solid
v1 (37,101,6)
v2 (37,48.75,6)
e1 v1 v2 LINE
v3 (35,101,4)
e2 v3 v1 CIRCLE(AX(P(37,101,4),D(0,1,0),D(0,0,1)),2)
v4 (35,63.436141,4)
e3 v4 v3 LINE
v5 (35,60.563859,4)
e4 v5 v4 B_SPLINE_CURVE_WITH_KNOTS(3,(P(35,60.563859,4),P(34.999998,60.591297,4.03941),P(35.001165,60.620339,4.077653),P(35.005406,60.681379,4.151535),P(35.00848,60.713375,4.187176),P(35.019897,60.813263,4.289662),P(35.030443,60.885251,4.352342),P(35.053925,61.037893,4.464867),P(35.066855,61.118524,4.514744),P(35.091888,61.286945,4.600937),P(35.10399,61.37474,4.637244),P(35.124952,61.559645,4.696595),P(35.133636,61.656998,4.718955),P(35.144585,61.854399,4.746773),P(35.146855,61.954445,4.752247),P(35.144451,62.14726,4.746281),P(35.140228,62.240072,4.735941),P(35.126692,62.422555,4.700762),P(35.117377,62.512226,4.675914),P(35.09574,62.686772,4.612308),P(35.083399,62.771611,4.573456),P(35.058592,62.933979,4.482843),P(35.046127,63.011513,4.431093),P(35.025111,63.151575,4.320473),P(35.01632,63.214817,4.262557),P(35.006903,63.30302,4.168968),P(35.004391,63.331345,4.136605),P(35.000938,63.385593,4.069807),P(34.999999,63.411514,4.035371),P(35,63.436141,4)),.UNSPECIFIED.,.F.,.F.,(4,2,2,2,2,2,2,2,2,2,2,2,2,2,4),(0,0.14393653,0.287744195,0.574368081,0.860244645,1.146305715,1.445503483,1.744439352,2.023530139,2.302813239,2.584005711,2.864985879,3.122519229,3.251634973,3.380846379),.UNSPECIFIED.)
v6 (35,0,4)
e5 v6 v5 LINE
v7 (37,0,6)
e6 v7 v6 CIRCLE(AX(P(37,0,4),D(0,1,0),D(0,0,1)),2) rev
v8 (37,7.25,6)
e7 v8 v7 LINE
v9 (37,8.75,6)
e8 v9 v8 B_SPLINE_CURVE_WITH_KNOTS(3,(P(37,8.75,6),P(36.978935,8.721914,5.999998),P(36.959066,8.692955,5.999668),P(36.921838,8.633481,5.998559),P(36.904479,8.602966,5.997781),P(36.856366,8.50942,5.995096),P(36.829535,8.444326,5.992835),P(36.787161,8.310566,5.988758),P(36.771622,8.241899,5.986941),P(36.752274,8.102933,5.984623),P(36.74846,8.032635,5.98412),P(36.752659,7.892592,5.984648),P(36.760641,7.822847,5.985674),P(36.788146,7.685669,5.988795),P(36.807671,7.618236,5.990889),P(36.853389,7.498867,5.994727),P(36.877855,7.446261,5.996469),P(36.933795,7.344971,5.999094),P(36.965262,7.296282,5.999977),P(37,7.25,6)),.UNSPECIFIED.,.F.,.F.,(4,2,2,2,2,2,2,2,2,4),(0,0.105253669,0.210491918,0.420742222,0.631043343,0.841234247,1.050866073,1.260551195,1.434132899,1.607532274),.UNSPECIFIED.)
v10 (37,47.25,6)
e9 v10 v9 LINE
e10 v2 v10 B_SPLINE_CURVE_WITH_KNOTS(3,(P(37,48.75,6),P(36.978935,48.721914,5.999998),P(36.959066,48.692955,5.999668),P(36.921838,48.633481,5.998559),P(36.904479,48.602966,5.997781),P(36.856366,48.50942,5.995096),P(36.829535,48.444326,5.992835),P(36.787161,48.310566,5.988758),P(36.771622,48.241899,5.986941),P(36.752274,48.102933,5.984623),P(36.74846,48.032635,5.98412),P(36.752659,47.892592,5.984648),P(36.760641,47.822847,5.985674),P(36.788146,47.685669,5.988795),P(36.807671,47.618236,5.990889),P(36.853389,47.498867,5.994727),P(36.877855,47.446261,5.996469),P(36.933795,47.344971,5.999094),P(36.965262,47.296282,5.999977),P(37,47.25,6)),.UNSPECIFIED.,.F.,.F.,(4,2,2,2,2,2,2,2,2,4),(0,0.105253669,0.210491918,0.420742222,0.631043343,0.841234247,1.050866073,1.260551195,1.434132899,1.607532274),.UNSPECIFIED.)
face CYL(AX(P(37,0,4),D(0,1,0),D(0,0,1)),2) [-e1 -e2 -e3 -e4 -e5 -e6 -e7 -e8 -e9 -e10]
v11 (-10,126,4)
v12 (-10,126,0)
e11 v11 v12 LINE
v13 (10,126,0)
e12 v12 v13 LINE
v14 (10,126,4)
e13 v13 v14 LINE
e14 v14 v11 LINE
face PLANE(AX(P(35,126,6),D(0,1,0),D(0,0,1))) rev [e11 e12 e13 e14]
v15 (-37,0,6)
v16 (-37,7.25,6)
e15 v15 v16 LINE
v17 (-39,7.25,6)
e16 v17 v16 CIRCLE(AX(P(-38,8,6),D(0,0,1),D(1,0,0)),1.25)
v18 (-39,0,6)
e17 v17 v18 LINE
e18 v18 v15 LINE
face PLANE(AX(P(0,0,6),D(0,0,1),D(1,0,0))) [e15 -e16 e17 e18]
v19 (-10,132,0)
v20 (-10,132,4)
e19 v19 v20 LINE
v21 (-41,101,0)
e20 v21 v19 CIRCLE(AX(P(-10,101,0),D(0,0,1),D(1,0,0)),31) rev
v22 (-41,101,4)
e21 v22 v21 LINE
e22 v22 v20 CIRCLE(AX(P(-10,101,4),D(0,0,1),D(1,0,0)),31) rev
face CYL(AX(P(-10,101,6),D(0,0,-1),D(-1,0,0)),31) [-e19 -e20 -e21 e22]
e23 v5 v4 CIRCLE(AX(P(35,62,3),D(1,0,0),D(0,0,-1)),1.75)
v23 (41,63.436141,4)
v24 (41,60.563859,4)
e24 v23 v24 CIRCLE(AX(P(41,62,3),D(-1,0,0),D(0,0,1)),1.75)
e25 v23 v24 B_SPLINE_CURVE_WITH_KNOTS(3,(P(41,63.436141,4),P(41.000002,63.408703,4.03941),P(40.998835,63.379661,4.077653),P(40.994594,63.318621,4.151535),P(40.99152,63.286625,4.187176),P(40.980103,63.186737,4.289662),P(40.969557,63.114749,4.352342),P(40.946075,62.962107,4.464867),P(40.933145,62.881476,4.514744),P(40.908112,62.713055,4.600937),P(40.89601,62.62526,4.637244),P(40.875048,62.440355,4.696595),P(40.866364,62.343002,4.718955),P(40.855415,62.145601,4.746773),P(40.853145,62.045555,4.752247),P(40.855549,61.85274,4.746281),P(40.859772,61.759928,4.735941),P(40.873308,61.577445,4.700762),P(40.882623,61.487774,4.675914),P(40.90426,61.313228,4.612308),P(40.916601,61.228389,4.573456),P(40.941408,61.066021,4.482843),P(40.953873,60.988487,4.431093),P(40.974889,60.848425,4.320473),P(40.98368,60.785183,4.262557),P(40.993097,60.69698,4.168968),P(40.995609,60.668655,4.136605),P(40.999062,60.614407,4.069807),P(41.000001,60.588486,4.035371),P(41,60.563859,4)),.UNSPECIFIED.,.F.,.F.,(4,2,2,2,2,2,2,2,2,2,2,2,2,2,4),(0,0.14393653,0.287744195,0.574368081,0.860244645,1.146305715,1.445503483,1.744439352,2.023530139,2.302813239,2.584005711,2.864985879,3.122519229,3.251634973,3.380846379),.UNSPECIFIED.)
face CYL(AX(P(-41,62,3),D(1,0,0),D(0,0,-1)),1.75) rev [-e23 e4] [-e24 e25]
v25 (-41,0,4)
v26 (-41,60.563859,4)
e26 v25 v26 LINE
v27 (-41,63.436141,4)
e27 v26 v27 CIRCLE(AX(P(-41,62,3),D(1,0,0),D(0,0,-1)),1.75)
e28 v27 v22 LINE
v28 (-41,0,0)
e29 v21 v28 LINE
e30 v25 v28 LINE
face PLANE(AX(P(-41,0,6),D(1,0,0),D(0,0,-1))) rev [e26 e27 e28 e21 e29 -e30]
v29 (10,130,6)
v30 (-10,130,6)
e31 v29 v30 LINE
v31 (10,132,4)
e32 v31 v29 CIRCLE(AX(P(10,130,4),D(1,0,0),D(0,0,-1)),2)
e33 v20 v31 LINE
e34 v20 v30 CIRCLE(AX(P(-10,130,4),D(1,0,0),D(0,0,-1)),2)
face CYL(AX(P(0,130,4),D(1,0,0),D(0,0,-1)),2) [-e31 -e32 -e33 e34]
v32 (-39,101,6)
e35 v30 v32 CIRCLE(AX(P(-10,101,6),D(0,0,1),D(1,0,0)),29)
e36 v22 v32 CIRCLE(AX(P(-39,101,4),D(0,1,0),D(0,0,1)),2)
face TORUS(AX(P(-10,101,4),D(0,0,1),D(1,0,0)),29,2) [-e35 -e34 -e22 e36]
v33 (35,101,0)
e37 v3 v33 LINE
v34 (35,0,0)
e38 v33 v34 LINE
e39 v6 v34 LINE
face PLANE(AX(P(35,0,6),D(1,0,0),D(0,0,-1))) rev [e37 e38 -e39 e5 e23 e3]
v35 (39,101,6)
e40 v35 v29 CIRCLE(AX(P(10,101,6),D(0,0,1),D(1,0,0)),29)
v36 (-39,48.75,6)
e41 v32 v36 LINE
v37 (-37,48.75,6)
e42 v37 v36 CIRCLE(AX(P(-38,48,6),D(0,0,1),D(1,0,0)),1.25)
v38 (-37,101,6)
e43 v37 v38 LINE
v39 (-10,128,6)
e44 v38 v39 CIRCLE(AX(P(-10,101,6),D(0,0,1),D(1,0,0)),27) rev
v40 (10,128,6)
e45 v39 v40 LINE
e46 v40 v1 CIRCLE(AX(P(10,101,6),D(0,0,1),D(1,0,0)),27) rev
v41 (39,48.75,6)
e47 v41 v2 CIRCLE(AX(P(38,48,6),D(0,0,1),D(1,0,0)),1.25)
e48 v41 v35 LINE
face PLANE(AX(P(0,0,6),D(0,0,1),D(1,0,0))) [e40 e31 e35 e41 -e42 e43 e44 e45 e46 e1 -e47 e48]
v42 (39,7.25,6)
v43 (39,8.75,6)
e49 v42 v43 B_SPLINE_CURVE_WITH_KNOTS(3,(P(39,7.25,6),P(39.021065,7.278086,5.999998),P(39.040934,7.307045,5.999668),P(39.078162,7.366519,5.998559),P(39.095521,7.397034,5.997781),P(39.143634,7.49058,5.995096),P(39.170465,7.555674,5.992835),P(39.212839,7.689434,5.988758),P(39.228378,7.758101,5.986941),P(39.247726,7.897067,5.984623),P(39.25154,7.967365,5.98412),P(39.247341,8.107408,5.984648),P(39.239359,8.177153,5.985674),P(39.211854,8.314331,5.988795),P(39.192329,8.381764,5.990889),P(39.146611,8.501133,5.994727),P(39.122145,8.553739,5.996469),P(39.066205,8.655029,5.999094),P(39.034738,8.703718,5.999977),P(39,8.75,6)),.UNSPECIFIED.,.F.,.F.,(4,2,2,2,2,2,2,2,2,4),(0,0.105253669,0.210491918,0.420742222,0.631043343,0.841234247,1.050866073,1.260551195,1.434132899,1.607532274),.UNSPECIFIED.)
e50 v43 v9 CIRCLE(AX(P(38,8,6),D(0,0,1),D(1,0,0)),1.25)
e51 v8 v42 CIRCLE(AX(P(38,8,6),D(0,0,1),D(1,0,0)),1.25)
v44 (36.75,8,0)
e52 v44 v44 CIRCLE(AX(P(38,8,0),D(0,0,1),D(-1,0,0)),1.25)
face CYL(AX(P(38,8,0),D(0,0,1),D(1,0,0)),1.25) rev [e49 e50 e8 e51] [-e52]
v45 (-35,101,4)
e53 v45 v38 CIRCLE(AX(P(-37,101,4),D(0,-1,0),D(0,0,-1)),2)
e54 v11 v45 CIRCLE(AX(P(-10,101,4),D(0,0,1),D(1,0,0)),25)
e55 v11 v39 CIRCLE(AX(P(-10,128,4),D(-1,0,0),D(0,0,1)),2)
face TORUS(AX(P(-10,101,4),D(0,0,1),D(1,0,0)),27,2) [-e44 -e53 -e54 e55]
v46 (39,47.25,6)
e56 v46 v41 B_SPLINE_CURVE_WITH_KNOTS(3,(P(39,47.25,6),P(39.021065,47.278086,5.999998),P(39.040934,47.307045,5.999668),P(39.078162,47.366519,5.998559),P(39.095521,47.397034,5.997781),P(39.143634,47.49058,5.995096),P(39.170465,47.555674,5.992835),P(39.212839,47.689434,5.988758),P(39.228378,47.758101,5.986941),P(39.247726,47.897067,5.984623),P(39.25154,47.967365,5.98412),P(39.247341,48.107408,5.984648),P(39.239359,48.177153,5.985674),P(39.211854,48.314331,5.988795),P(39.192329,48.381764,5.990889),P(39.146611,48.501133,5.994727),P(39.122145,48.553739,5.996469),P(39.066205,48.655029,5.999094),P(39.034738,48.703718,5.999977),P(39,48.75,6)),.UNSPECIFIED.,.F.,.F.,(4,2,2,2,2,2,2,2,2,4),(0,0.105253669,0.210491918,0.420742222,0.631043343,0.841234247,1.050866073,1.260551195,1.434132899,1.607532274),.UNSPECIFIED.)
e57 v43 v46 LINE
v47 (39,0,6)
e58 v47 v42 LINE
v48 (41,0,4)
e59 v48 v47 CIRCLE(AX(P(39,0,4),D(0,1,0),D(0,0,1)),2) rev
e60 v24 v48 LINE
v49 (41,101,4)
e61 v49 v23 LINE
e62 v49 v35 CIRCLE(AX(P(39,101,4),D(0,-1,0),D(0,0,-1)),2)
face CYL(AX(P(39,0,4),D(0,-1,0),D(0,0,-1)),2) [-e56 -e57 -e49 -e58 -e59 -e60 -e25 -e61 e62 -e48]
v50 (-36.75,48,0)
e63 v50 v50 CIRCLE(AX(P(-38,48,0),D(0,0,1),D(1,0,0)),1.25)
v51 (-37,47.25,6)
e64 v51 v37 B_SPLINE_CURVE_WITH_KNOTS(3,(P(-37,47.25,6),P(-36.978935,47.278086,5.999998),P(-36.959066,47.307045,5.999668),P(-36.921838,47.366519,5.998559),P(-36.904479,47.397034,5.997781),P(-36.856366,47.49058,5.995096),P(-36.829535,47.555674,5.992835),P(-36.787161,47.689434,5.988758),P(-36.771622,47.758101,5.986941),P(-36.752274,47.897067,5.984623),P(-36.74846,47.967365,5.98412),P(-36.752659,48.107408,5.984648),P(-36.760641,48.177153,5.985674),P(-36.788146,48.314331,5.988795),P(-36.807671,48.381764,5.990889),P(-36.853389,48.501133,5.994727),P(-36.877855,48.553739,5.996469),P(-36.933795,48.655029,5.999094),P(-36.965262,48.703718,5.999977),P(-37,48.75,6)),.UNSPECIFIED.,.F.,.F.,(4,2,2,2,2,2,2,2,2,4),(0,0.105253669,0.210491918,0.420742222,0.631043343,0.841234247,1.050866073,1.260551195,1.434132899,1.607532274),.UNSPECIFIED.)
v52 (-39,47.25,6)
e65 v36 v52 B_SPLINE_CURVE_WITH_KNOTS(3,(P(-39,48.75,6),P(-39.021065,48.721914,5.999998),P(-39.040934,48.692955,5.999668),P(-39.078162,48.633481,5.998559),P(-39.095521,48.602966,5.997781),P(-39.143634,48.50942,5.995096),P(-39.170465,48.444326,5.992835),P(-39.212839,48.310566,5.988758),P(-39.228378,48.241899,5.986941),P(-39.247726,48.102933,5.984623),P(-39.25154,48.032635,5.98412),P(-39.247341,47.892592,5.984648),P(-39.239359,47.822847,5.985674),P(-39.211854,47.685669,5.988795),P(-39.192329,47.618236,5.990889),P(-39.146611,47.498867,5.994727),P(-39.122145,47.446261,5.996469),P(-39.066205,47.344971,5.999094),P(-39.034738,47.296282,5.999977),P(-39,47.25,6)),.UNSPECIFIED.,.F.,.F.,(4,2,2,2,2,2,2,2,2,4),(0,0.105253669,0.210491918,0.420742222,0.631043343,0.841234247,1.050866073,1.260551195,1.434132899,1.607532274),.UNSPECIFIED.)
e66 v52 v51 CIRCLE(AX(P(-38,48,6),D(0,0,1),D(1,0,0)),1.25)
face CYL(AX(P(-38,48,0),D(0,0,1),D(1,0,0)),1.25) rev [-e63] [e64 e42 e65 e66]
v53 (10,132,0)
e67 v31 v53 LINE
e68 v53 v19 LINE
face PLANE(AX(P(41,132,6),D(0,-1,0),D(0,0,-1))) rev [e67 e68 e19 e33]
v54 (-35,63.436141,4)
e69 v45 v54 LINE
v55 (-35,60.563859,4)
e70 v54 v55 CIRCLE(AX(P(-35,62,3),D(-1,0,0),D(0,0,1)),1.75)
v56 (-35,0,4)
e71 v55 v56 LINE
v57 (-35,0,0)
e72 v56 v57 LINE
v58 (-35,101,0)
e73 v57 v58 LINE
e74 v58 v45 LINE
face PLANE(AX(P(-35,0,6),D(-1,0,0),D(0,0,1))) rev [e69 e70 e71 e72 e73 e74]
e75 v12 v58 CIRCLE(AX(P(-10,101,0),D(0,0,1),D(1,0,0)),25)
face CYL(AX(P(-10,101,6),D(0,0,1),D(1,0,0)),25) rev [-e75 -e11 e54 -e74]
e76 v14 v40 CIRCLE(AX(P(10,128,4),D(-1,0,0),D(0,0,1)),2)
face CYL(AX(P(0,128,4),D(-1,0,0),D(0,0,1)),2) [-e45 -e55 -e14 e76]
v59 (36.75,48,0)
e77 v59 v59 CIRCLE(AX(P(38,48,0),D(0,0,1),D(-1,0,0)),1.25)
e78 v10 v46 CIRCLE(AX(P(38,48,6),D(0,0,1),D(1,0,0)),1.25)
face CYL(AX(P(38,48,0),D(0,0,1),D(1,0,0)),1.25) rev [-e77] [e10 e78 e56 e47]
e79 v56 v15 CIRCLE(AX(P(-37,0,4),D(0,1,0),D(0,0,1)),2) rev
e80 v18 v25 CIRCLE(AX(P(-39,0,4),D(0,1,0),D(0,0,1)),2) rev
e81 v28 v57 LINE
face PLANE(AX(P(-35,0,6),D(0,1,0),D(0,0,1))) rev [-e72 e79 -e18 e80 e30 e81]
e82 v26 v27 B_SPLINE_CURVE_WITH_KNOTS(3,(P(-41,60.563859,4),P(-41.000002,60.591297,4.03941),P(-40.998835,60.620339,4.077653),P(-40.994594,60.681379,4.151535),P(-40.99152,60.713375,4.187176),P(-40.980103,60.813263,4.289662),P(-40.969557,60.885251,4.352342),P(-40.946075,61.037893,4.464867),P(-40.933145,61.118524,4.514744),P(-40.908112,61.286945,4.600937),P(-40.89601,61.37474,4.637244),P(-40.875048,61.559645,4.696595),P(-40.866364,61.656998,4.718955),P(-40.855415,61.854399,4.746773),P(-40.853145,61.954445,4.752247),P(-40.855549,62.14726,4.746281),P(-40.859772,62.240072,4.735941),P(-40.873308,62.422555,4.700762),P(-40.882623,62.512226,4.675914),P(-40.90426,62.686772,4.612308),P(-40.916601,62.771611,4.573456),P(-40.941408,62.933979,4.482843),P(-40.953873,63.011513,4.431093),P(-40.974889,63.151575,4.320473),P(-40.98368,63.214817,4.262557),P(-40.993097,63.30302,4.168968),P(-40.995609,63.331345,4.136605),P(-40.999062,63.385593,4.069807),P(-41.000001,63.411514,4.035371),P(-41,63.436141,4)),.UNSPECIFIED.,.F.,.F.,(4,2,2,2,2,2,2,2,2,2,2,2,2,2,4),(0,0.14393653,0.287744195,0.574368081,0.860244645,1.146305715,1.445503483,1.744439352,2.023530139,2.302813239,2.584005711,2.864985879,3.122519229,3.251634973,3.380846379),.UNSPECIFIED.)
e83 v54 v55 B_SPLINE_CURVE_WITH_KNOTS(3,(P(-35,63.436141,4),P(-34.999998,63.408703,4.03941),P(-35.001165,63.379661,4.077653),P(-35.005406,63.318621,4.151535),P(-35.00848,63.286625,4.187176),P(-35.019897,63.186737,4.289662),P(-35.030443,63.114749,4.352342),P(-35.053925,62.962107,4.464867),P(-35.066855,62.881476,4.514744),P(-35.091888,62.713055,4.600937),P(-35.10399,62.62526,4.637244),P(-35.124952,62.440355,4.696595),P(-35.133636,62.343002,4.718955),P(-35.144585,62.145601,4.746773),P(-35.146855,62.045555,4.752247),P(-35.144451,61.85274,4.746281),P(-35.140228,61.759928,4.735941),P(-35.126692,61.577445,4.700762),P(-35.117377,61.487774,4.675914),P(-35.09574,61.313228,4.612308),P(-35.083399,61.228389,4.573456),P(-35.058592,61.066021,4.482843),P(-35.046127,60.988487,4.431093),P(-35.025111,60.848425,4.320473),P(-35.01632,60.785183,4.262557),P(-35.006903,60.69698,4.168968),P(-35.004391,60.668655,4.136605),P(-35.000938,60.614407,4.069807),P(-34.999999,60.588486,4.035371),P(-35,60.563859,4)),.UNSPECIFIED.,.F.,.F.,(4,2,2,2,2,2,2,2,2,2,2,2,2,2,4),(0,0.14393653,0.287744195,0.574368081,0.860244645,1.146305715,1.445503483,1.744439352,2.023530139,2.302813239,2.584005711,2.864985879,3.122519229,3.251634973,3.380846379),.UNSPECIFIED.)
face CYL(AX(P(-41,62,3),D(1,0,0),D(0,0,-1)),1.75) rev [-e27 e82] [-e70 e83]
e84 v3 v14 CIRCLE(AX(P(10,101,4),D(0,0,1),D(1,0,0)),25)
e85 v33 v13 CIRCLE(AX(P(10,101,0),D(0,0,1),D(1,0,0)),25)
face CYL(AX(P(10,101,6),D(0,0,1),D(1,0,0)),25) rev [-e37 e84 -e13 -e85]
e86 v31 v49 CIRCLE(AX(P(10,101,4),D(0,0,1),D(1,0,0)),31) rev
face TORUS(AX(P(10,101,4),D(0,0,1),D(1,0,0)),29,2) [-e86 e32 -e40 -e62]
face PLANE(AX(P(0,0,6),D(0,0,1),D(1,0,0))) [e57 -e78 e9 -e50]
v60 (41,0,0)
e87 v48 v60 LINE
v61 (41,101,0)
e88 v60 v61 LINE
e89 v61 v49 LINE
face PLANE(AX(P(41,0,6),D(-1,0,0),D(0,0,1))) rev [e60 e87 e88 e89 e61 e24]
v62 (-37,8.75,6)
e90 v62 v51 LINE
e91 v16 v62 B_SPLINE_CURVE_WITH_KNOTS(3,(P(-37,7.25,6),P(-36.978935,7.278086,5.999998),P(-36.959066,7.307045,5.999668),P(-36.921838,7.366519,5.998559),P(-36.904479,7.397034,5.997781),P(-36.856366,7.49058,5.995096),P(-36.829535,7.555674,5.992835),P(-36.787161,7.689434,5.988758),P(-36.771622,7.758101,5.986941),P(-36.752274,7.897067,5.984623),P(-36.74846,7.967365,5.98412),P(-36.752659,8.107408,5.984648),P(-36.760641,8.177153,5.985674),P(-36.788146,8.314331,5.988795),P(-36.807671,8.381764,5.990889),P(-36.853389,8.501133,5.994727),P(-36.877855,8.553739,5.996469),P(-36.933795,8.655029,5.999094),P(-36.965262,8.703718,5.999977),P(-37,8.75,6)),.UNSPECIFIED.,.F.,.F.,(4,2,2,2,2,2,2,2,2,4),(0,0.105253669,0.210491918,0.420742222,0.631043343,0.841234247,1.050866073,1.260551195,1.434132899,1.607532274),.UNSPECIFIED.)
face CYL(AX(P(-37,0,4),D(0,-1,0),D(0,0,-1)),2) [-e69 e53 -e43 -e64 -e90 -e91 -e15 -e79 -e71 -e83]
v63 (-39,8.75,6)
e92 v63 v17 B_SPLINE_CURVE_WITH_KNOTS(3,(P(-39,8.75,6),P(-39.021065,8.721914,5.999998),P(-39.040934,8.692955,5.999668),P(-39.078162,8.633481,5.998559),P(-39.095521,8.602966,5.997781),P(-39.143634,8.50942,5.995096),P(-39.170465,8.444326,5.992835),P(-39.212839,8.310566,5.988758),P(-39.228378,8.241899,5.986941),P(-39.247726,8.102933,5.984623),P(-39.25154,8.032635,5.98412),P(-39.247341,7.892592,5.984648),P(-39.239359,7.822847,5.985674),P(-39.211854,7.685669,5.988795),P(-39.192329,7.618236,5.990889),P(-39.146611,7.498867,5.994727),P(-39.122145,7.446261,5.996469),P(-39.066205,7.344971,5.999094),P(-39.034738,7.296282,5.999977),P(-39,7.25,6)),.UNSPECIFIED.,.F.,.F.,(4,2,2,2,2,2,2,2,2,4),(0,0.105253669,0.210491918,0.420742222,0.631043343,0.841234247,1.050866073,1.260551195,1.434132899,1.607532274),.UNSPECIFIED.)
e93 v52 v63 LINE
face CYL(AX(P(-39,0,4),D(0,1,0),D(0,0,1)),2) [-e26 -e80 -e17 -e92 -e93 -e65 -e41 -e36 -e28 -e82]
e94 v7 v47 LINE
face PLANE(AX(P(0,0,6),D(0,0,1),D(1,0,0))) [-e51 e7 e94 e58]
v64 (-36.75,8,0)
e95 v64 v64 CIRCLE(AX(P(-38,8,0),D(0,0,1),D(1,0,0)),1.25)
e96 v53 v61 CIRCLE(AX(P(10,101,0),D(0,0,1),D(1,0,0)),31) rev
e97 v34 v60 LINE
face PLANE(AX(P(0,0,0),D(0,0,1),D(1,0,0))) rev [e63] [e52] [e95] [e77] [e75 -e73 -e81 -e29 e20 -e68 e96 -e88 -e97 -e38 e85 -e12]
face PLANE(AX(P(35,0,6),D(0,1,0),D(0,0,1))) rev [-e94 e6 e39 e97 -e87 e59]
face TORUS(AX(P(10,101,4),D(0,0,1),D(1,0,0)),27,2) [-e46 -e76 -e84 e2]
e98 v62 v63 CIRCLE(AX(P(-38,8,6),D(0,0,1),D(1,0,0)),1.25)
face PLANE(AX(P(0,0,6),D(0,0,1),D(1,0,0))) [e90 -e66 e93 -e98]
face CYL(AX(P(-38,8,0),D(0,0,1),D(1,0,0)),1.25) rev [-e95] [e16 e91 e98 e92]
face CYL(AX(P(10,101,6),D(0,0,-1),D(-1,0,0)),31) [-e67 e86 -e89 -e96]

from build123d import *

# Parameters (mm, degrees)
BOSS_EXTRU_1_DEPTH           = 6
ENL_V_MAT_EXTRU_1_DEPTH      = 139.351002888
ENL_V_MAT_EXTRU_1_DEPTH_BACK = 139.351002888
ESQUISSE2_R                  = 1.25
CONG_1_R                     = 25
CONG_2_R                     = 31
CONG_3_R                     = 2
ENL_V_MAT_EXTRU_2_DEPTH      = 156.512057552
ENL_V_MAT_EXTRU_2_DEPTH_BACK = 156.512057552
ESQUISSE3_R                  = 1.75


with BuildPart() as part:
    # Esquisse1 → Boss.-Extru.1 (new body)
    with BuildSketch(Plane.XY):
        Polygon((35, 0), (35, 126), (-35, 126), (-35, 0), (-41, 0), (-41, 132), (41, 132), (41, 0), align=None)
    extrude(amount=BOSS_EXTRU_1_DEPTH)

    # Esquisse2 → Enlèv. mat.-Extru.1 (cut, two sides: drawn at the far end of the back side and taken through both)
    with BuildSketch(Plane.XY.offset(6).offset(-ENL_V_MAT_EXTRU_1_DEPTH_BACK)):
        with Locations((-38, 48)):
            Circle(ESQUISSE2_R)
        with Locations((-38, 8)):
            Circle(ESQUISSE2_R)
        with Locations((38, 8)):
            Circle(ESQUISSE2_R)
        with Locations((38, 48)):
            Circle(ESQUISSE2_R)
    extrude(amount=ENL_V_MAT_EXTRU_1_DEPTH + ENL_V_MAT_EXTRU_1_DEPTH_BACK, mode=Mode.SUBTRACT)

    # Congé1
    cong_1_edges = [part.edges().sort_by_distance(p)[0] for p in [
        (35, 126, 3),
        (-35, 126, 3),
    ]]
    fillet(cong_1_edges, radius=CONG_1_R)

    # Congé2
    cong_2_edges = [part.edges().sort_by_distance(p)[0] for p in [
        (-41, 132, 3),
        (41, 132, 3),
    ]]
    fillet(cong_2_edges, radius=CONG_2_R)

    # Congé3
    # the kernel refuses this fillet: 2 mm, written as the material it takes off along each edge
    with BuildSketch(Plane(origin=(-35, 101, 6), x_dir=(0, 0, -1), z_dir=(0, -1, 0)), Plane(origin=(35, -5, 6), x_dir=(0, 0, -1), z_dir=(0, 1, 0)), Plane(origin=(-41, -5, 6), x_dir=(0, 0, -1), z_dir=(0, 1, 0)), Plane(origin=(41, 101, 6), x_dir=(0, 0, -1), z_dir=(0, -1, 0))) as cong_3_piece_1:
        with BuildLine():
            CenterArc((CONG_3_R, -CONG_3_R), CONG_3_R, 90, 90)
            Line((0, -CONG_3_R), (0, 0))
            Line((0, 0), (CONG_3_R, 0))
        make_face()
    extrude(amount=106, mode=Mode.SUBTRACT)
    with BuildSketch(Plane(origin=(10, 126, 6), x_dir=(0, 0, -1), z_dir=(-1, 0, 0)), Plane(origin=(-10, 132, 6), x_dir=(0, 0, -1), z_dir=(1, 0, 0))) as cong_3_piece_2:
        with BuildLine():
            CenterArc((CONG_3_R, -CONG_3_R), CONG_3_R, 90, 90)
            Line((0, -CONG_3_R), (0, 0))
            Line((0, 0), (CONG_3_R, 0))
        make_face()
    extrude(amount=20, mode=Mode.SUBTRACT)
    with BuildSketch(Plane(origin=(10, 101, 6), x_dir=(1, 0, 0), z_dir=(0, -1, 0))) as cong_3_piece_3:
        with BuildLine():
            CenterArc((25 + CONG_3_R, -CONG_3_R), CONG_3_R, 90, 90)
            Line((25 + CONG_3_R, 0), (25, 0))
            Line((25, 0), (25, -CONG_3_R))
        make_face()
    revolve(axis=Axis((10, 101, 6), (0, 0, 1)), revolution_arc=90, mode=Mode.SUBTRACT)
    with BuildSketch(Plane(origin=(-10, 101, 6), x_dir=(0, 1, 0), z_dir=(1, 0, 0))) as cong_3_piece_4:
        with BuildLine():
            CenterArc((25 + CONG_3_R, -CONG_3_R), CONG_3_R, 90, 90)
            Line((25 + CONG_3_R, 0), (25, 0))
            Line((25, 0), (25, -CONG_3_R))
        make_face()
    revolve(axis=Axis((-10, 101, 6), (0, 0, 1)), revolution_arc=90, mode=Mode.SUBTRACT)
    with BuildSketch(Plane(origin=(-10, 101, 6), x_dir=(0, 1, 0), z_dir=(1, 0, 0))) as cong_3_piece_5:
        with BuildLine():
            CenterArc((31 - CONG_3_R, -CONG_3_R), CONG_3_R, 0, 90)
            Line((31 - CONG_3_R, 0), (31, 0))
            Line((31, 0), (31, -CONG_3_R))
        make_face()
    revolve(axis=Axis((-10, 101, 6), (0, 0, 1)), revolution_arc=90, mode=Mode.SUBTRACT)
    with BuildSketch(Plane(origin=(10, 101, 6), x_dir=(1, 0, 0), z_dir=(0, -1, 0))) as cong_3_piece_6:
        with BuildLine():
            CenterArc((31 - CONG_3_R, -CONG_3_R), CONG_3_R, 0, 90)
            Line((31 - CONG_3_R, 0), (31, 0))
            Line((31, 0), (31, -CONG_3_R))
        make_face()
    revolve(axis=Axis((10, 101, 6), (0, 0, 1)), revolution_arc=90, mode=Mode.SUBTRACT)

    # Esquisse3 → Enlèv. mat.-Extru.2 (cut, two sides: drawn at the far end of the back side and taken through both)
    with BuildSketch(Plane(origin=(41, 0, 0), x_dir=(0, 0, -1), z_dir=(1, 0, 0)).offset(-ENL_V_MAT_EXTRU_2_DEPTH_BACK)):
        with Locations(Location((-3, 62, 0), (0, 0, 124.849904579))):
            Circle(ESQUISSE3_R)
    extrude(amount=ENL_V_MAT_EXTRU_2_DEPTH + ENL_V_MAT_EXTRU_2_DEPTH_BACK, mode=Mode.SUBTRACT)


solid = part.part
